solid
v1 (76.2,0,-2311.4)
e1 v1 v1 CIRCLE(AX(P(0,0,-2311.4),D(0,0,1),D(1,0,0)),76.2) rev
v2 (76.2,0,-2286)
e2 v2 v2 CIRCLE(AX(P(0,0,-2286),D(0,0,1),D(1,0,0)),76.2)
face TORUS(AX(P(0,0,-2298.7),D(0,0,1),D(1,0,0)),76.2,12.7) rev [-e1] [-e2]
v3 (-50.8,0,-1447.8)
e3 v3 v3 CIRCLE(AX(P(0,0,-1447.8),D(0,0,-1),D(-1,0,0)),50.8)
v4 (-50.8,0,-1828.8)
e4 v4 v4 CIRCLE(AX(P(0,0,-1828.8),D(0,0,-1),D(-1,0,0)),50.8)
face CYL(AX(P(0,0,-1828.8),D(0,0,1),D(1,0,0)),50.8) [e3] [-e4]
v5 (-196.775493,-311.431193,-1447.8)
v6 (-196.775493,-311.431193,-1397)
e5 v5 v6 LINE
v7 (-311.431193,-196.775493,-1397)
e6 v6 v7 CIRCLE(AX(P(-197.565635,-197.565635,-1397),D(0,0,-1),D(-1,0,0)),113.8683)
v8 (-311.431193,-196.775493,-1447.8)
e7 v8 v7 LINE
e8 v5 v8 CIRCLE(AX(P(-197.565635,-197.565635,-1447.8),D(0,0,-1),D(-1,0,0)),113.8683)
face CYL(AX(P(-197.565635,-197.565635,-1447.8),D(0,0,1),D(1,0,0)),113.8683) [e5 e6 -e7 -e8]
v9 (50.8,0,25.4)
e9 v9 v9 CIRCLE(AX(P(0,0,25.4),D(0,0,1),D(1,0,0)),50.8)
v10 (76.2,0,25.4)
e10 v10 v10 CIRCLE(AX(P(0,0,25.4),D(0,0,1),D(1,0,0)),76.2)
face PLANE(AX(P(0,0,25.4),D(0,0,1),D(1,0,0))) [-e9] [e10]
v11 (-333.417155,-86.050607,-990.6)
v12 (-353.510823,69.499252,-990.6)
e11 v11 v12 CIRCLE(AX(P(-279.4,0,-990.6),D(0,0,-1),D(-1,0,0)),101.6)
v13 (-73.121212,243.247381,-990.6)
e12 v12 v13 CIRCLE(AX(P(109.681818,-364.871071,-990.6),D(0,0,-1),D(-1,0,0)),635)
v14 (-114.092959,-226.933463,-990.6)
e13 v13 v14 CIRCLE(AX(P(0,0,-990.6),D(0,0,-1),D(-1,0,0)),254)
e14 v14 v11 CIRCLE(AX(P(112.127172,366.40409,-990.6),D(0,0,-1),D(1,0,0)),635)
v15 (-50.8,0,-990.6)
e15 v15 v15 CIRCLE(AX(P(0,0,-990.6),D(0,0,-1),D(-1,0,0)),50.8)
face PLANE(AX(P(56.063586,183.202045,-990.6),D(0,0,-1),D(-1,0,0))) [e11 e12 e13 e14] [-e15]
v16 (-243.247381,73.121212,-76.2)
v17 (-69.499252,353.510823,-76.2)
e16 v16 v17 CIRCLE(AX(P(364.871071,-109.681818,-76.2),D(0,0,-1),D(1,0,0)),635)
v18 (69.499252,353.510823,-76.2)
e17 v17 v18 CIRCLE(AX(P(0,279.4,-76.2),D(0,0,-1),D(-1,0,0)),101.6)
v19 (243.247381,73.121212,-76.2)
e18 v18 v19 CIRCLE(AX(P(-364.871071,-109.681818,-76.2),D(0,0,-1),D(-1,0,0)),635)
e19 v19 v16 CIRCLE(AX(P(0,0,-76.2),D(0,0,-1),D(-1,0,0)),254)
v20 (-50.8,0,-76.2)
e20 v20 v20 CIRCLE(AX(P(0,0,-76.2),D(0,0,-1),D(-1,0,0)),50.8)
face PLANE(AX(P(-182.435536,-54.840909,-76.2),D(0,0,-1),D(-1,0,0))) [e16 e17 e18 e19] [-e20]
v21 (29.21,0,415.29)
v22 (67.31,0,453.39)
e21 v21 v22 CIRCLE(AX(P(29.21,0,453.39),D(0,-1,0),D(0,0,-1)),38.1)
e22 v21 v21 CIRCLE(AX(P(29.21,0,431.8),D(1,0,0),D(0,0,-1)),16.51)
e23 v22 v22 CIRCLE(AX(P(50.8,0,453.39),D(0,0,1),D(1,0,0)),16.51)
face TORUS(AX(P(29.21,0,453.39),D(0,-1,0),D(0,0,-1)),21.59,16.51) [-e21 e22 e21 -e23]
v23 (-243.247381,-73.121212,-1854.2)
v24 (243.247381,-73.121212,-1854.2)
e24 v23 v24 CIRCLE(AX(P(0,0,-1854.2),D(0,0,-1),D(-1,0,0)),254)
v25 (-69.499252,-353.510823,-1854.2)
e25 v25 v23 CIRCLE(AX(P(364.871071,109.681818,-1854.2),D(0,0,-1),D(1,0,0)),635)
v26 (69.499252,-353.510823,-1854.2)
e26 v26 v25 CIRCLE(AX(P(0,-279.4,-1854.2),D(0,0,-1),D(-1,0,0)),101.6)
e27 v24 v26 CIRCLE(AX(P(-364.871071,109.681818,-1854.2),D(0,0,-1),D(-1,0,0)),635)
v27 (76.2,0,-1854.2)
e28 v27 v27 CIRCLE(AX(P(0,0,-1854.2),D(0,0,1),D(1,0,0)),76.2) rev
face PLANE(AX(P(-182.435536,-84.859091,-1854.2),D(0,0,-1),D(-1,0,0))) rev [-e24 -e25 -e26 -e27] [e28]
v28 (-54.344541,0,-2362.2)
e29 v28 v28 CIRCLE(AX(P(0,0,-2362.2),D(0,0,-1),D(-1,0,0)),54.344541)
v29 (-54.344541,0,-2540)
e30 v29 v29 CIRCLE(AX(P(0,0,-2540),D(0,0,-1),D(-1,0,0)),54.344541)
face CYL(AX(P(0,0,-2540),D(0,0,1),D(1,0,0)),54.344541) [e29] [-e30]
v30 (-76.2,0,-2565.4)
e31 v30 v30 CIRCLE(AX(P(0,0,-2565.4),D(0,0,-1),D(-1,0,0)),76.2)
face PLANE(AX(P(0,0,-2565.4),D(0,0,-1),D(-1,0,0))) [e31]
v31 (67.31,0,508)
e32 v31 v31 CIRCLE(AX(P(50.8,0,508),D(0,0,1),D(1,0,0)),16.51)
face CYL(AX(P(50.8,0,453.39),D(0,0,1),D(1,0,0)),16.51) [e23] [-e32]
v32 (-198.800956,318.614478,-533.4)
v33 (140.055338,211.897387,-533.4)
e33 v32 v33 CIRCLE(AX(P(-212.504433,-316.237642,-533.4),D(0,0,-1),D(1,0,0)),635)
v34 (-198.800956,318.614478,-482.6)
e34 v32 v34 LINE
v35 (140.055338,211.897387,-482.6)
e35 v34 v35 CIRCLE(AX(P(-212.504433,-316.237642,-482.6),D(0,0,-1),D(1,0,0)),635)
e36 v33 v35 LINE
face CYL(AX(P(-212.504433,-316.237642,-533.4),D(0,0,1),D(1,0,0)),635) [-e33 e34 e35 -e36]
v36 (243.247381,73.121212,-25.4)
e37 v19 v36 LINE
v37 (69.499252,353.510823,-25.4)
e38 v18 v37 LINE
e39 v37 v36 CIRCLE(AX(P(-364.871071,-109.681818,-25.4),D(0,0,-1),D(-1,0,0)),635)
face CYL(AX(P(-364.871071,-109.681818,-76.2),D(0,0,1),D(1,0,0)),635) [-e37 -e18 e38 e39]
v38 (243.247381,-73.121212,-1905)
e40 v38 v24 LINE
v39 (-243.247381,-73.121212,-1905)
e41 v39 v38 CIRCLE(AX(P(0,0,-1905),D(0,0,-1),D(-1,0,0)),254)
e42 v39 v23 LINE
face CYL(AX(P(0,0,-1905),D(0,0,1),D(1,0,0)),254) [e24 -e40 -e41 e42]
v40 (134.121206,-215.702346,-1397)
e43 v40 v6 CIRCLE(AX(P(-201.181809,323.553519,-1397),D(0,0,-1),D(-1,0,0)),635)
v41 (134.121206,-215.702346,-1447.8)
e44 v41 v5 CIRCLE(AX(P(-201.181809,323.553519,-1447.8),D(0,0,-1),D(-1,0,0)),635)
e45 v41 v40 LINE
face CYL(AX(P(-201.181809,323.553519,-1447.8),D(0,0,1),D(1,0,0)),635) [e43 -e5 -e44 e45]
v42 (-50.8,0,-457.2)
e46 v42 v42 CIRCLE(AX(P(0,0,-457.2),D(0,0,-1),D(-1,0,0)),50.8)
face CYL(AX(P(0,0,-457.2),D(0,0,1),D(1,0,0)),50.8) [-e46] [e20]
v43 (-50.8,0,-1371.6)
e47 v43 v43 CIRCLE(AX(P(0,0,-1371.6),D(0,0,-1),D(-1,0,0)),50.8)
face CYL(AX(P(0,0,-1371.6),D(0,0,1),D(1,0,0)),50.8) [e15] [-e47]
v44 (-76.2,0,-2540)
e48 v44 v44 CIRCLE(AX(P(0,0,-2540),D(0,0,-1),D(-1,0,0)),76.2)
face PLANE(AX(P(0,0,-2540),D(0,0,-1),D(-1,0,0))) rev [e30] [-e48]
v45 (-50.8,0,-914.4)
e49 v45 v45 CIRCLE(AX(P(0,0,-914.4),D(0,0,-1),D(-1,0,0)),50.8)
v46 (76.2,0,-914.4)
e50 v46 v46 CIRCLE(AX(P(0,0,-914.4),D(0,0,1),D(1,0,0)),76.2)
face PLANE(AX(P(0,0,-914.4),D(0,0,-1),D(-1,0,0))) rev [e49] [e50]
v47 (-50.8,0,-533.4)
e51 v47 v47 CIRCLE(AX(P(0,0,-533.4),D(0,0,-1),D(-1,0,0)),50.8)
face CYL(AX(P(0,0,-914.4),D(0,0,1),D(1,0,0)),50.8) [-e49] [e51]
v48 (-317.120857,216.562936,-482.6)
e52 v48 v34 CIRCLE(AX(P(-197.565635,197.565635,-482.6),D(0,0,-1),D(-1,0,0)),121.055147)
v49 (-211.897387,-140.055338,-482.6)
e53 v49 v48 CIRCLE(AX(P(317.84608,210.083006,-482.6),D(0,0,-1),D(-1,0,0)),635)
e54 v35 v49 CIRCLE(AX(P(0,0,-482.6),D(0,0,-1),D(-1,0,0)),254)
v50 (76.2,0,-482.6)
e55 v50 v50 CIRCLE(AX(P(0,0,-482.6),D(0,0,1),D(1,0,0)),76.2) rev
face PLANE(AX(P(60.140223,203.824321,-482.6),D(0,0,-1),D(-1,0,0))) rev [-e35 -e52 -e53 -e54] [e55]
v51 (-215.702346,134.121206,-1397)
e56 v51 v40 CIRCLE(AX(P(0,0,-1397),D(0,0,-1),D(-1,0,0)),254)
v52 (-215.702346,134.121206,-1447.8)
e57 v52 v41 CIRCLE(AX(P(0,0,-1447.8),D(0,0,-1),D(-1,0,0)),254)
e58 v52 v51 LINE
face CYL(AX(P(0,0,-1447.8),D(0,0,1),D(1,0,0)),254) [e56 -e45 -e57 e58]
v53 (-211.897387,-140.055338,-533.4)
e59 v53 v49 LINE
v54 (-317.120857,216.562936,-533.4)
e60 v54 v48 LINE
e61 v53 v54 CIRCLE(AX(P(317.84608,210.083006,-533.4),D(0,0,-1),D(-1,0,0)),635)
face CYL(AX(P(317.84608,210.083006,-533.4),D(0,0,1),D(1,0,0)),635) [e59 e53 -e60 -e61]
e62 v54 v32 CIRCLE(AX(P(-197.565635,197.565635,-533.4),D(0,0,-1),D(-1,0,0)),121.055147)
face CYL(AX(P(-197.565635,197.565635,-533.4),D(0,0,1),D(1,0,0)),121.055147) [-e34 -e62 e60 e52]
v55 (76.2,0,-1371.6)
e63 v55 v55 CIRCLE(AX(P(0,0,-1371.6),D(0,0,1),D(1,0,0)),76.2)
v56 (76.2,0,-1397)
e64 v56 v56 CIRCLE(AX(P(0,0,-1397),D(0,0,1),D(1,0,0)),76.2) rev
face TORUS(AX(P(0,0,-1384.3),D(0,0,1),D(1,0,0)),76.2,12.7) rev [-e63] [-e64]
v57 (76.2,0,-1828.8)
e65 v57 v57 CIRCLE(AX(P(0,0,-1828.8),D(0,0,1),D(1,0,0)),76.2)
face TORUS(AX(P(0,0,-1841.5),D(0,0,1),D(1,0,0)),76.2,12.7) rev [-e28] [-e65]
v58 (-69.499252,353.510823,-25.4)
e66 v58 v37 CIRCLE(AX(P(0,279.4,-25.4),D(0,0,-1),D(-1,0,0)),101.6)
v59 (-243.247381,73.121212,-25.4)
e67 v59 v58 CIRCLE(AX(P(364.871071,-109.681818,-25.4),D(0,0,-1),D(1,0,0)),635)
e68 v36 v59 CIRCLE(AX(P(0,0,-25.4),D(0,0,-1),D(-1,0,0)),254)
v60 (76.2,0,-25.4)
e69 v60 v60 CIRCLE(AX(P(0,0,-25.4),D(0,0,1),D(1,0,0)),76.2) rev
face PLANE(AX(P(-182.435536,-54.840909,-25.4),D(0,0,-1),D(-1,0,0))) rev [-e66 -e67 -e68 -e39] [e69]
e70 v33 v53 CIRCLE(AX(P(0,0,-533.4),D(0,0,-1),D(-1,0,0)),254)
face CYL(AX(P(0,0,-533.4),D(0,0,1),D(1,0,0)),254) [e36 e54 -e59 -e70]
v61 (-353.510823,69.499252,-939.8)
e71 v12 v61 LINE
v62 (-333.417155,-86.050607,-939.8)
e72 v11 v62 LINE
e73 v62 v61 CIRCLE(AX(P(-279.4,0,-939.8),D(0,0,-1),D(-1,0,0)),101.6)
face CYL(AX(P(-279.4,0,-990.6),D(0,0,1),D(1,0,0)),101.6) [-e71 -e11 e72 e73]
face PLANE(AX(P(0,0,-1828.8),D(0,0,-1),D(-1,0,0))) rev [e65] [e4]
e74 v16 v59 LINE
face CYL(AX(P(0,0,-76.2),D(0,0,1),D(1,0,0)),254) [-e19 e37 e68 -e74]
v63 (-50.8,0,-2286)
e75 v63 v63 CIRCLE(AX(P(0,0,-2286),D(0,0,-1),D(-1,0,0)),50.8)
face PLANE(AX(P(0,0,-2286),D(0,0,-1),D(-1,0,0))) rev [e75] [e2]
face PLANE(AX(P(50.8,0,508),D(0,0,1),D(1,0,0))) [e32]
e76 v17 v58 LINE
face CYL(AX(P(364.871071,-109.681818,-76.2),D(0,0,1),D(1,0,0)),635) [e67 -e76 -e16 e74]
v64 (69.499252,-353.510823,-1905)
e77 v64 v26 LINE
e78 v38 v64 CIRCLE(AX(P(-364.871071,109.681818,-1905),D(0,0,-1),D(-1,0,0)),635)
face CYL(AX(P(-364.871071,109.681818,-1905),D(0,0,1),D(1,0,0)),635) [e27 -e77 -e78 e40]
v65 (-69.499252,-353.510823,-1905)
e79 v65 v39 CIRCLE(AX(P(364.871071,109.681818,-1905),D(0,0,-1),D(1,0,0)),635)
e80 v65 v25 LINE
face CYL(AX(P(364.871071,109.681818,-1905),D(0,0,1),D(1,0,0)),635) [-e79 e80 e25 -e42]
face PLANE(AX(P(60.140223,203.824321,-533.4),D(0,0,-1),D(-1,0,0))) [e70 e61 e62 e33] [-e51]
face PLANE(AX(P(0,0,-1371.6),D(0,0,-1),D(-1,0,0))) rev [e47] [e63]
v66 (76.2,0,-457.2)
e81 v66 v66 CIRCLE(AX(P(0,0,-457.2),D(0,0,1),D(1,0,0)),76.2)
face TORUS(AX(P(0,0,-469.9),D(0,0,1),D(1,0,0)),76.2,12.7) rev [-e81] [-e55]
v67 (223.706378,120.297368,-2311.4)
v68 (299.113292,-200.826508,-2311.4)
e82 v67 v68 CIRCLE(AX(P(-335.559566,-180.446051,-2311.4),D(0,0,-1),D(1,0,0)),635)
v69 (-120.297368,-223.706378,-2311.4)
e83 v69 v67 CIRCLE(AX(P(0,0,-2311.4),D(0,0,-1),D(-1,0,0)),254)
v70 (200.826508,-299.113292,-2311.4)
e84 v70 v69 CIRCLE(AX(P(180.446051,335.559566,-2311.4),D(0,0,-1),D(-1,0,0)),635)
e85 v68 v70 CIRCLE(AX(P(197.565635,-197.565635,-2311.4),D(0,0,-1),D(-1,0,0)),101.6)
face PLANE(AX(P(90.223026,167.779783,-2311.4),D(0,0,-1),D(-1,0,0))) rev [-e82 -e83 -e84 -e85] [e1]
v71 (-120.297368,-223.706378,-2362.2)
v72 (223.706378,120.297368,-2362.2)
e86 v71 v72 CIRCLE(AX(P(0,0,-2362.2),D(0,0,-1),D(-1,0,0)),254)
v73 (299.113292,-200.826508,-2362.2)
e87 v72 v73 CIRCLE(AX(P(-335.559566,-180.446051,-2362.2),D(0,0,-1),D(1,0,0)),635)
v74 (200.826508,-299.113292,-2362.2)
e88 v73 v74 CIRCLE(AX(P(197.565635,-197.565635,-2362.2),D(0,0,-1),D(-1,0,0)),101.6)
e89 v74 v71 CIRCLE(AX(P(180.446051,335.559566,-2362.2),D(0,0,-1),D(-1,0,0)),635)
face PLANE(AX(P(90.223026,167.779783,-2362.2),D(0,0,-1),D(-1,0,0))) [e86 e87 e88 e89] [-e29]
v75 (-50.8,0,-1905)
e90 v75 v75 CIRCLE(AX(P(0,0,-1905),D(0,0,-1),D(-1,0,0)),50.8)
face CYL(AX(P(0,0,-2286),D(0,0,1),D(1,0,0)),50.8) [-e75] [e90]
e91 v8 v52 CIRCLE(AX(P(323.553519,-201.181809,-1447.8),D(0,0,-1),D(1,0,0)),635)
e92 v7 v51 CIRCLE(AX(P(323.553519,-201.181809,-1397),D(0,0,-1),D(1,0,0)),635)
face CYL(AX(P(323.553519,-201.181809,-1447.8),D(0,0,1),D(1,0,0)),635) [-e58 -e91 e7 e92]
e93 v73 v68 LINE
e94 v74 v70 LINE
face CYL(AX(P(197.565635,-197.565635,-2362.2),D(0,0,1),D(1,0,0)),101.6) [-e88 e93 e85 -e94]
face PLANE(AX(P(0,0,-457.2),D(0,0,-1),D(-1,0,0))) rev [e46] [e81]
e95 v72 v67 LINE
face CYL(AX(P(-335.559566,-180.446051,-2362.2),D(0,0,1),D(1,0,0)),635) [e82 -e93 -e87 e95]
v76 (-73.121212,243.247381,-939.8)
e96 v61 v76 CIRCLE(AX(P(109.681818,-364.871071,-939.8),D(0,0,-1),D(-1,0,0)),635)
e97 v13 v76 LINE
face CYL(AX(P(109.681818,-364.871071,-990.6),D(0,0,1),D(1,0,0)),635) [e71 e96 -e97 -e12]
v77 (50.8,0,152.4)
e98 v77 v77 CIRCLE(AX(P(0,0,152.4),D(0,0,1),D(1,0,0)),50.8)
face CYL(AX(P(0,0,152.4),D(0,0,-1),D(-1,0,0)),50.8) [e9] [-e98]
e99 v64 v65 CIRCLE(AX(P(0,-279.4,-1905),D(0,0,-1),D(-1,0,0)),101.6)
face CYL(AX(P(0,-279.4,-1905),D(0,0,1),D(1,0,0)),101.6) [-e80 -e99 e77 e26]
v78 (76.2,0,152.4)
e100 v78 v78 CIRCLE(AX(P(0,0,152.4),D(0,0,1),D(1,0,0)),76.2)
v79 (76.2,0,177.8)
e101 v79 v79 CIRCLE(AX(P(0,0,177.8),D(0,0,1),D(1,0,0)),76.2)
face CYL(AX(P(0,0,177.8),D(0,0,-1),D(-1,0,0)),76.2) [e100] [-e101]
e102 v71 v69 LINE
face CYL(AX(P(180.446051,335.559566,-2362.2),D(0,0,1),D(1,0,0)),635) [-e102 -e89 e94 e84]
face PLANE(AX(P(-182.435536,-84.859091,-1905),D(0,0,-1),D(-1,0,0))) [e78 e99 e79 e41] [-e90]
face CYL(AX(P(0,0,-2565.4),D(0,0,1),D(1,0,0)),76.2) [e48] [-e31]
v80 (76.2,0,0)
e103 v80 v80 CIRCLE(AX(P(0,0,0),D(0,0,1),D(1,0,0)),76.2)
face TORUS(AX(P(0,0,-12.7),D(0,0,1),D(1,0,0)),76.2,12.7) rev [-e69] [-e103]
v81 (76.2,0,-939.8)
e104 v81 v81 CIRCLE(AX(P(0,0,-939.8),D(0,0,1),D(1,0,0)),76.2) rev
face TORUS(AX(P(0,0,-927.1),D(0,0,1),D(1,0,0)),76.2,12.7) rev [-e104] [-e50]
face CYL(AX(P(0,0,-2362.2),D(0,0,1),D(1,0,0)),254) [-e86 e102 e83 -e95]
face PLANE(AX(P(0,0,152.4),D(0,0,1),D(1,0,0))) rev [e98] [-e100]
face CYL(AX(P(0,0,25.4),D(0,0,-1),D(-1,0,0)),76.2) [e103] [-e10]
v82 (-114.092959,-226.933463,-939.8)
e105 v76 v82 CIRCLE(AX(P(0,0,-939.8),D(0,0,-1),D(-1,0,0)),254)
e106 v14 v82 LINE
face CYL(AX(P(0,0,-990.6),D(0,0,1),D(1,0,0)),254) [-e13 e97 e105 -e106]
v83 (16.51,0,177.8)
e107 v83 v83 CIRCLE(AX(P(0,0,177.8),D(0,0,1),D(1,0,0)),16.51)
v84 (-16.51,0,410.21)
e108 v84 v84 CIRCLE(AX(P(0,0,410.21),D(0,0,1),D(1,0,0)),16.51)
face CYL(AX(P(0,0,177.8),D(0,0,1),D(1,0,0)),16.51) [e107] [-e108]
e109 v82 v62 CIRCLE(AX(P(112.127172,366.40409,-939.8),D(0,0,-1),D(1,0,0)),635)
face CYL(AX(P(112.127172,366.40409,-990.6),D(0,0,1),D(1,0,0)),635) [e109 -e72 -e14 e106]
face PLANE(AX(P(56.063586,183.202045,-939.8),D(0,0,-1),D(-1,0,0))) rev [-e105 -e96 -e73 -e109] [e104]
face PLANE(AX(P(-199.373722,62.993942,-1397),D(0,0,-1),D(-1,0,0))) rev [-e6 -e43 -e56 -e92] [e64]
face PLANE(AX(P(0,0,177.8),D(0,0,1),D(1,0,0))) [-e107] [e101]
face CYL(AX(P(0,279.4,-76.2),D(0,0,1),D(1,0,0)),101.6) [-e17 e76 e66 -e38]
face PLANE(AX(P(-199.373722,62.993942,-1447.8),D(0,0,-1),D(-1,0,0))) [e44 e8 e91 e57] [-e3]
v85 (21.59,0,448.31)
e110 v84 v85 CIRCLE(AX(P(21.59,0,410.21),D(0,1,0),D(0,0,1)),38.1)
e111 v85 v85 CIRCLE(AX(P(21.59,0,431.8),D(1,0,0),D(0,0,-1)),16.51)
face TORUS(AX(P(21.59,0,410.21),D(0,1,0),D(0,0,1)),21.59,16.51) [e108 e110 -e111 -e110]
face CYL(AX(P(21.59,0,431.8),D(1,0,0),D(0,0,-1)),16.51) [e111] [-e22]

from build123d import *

# Parameters (mm, degrees)
SKETCH1_R            = 76.2
BOSS_EXTRUDE4_DEPTH  = 25.4
SKETCH7_R            = 50.8
BOSS_EXTRUDE5_DEPTH  = 127
SKETCH8_R            = 76.2
BOSS_EXTRUDE6_DEPTH  = 25.4
BOSS_EXTRUDE7_DEPTH  = 50.8
BOSS_EXTRUDE8_START  = 381
SKETCH12_R           = 50.8
BOSS_EXTRUDE8_DEPTH  = 381
BOSS_EXTRUDE10_DEPTH = 50.8
BOSS_EXTRUDE11_START = 381
SKETCH15_R           = 50.8
BOSS_EXTRUDE11_DEPTH = 381
BOSS_EXTRUDE12_DEPTH = 50.8
BOSS_EXTRUDE13_START = 381
SKETCH19_R           = 50.8
BOSS_EXTRUDE13_DEPTH = 381
BOSS_EXTRUDE14_DEPTH = 50.8
BOSS_EXTRUDE15_START = 381
SKETCH23_R           = 50.8
BOSS_EXTRUDE15_DEPTH = 381
BOSS_EXTRUDE16_DEPTH = 50.8
BOSS_EXTRUDE17_START = 381
SKETCH26_R           = 50.8
BOSS_EXTRUDE17_DEPTH = 381
BOSS_EXTRUDE18_DEPTH = 50.8
SKETCH29_R           = 54.344540656
BOSS_EXTRUDE19_DEPTH = 177.8
BOSS_EXTRUDE20_START = 25.4
SKETCH30_R           = 76.2
BOSS_EXTRUDE20_DEPTH = 25.4
SKETCH33_R           = 16.51


with BuildPart() as part:
    # Sketch1 → Boss-Extrude4 (new body)
    with BuildSketch(Plane.XY):
        Circle(SKETCH1_R)
    extrude(amount=BOSS_EXTRUDE4_DEPTH)

    # Sketch7 → Boss-Extrude5 (add)
    with BuildSketch(Plane.XY.offset(25.4)):
        Circle(SKETCH7_R)
    extrude(amount=BOSS_EXTRUDE5_DEPTH)

    # Sketch8 → Boss-Extrude6 (add)
    with BuildSketch(Plane.XY.offset(152.4)):
        Circle(SKETCH8_R)
    extrude(amount=BOSS_EXTRUDE6_DEPTH)

    # Sketch10 → Revolve2 (revolve)
    with BuildSketch(Plane(origin=(0, 0, 0), x_dir=(0, 0, -1), z_dir=(1, 0, 0))):
        with BuildLine():
            Line((0, 0), (25.4, 0))
            Line((25.4, 0), (25.4, 76.2))
            ThreePointArc((25.4, 76.2), (12.7, 63.5), (0, 76.2))
            Line((0, 76.2), (0, 0))
        make_face()
    revolve(axis=Axis((0, 0, 0), (0, 0, -1)))

    # Sketch11 → Boss-Extrude7 (add)
    with BuildSketch(Plane(origin=(0, 0, -25.4), x_dir=(-1, 0, 0), z_dir=(0, 0, -1))):
        with BuildLine():
            ThreePointArc((-243.247380948, 73.121212121), (0, -254), (243.247380948, 73.121212121))
            ThreePointArc((243.247380948, 73.121212121), (174.897670874, 224.794944599), (69.499251699, 353.510822511))
            ThreePointArc((69.499251699, 353.510822511), (0, 381), (-69.499251699, 353.510822511))
            ThreePointArc((-69.499251699, 353.510822511), (-174.897670874, 224.794944599), (-243.247380948, 73.121212121))
        make_face()
    extrude(amount=BOSS_EXTRUDE7_DEPTH)

    # Sketch12 → Boss-Extrude8 (add)
    with BuildSketch(Plane(origin=(0, 0, -76.2), x_dir=(-1, 0, 0), z_dir=(0, 0, -1)).offset(BOSS_EXTRUDE8_START)):
        Circle(SKETCH12_R)
    extrude(amount=-BOSS_EXTRUDE8_DEPTH)

    # Sketch13 → Revolve3 (revolve)
    with BuildSketch(Plane(origin=(0, 0, 0), x_dir=(0, 0, -1), z_dir=(1, 0, 0))):
        with BuildLine():
            Line((457.2, 0), (482.6, 0))
            Line((482.6, 0), (482.6, 76.2))
            ThreePointArc((482.6, 76.2), (469.9, 63.5), (457.2, 76.2))
            Line((457.2, 76.2), (457.2, 0))
        make_face()
    revolve(axis=Axis((0, 0, -457.2), (0, 0, -1)))

    # Sketch14 → Boss-Extrude10 (add)
    with BuildSketch(Plane(origin=(0, 0, -482.6), x_dir=(-1, 0, 0), z_dir=(0, 0, -1))):
        with BuildLine():
            ThreePointArc((-140.055337565, 211.897386533), (-179.605122421, -179.605122421), (211.897386533, -140.055337565))
            ThreePointArc((211.897386533, -140.055337565), (291.195568065, 30.379719884), (317.120856754, 216.562935583))
            ThreePointArc((317.120856754, 216.562935583), (276.630280142, 289.234224741), (198.800955585, 318.614478333))
            ThreePointArc((198.800955585, 318.614478333), (21.75767384, 289.436093569), (-140.055337565, 211.897386533))
        make_face()
    extrude(amount=BOSS_EXTRUDE10_DEPTH)

    # Sketch15 → Boss-Extrude11 (add)
    with BuildSketch(Plane(origin=(0, 0, -533.4), x_dir=(-1, 0, 0), z_dir=(0, 0, -1)).offset(BOSS_EXTRUDE11_START)):
        Circle(SKETCH15_R)
    extrude(amount=-BOSS_EXTRUDE11_DEPTH)

    # Sketch17 → Revolve4 (revolve)
    with BuildSketch(Plane(origin=(0, 0, 0), x_dir=(0, 0, -1), z_dir=(1, 0, 0))):
        with BuildLine():
            Line((914.4, 0), (939.8, 0))
            Line((939.8, 0), (939.8, 76.2))
            ThreePointArc((939.8, 76.2), (927.1, 63.5), (914.4, 76.2))
            Line((914.4, 76.2), (914.4, 0))
        make_face()
    revolve(axis=Axis((0, 0, -914.4), (0, 0, -1)))

    # Sketch18 → Boss-Extrude12 (add)
    with BuildSketch(Plane(origin=(0, 0, -939.8), x_dir=(-1, 0, 0), z_dir=(0, 0, -1))):
        with BuildLine():
            ThreePointArc((333.417154616, -86.050607245), (380.162762393, -13.016363354), (353.510822511, 69.499251699))
            ThreePointArc((353.510822511, 69.499251699), (224.794944599, 174.897670874), (73.121212121, 243.247380948))
            ThreePointArc((73.121212121, 243.247380948), (-253.041089583, -22.050101644), (114.09295874, -226.933463301))
            ThreePointArc((114.09295874, -226.933463301), (231.062085307, -167.867501553), (333.417154616, -86.050607245))
        make_face()
    extrude(amount=BOSS_EXTRUDE12_DEPTH)

    # Sketch19 → Boss-Extrude13 (add)
    with BuildSketch(Plane(origin=(0, 0, -990.6), x_dir=(-1, 0, 0), z_dir=(0, 0, -1)).offset(BOSS_EXTRUDE13_START)):
        Circle(SKETCH19_R)
    extrude(amount=-BOSS_EXTRUDE13_DEPTH)

    # Sketch21 → Revolve5 (revolve)
    with BuildSketch(Plane(origin=(0, 0, 0), x_dir=(0, 0, -1), z_dir=(1, 0, 0))):
        with BuildLine():
            Line((1371.6, 0), (1397, 0))
            Line((1397, 0), (1397, 76.2))
            ThreePointArc((1397, 76.2), (1384.3, 63.5), (1371.6, 76.2))
            Line((1371.6, 76.2), (1371.6, 0))
        make_face()
    revolve(axis=Axis((0, 0, -1371.6), (0, 0, -1)))

    # Sketch22 → Boss-Extrude14 (add)
    with BuildSketch(Plane(origin=(0, 0, -1397), x_dir=(-1, 0, 0), z_dir=(0, 0, -1))):
        with BuildLine():
            ThreePointArc((196.775493442, -311.431192903), (278.082681543, -278.082681543), (311.431192903, -196.775493442))
            ThreePointArc((311.431192903, -196.775493442), (286.432865733, -24.711952191), (215.702346017, 134.12120609))
            ThreePointArc((215.702346017, 134.12120609), (-179.605122421, 179.605122421), (-134.12120609, -215.702346017))
            ThreePointArc((-134.12120609, -215.702346017), (24.711952191, -286.432865733), (196.775493442, -311.431192903))
        make_face()
    extrude(amount=BOSS_EXTRUDE14_DEPTH)

    # Sketch23 → Boss-Extrude15 (add)
    with BuildSketch(Plane(origin=(0, 0, -1447.8), x_dir=(-1, 0, 0), z_dir=(0, 0, -1)).offset(BOSS_EXTRUDE15_START)):
        Circle(SKETCH23_R)
    extrude(amount=-BOSS_EXTRUDE15_DEPTH)

    # Sketch24 → Revolve6 (revolve)
    with BuildSketch(Plane(origin=(0, 0, 0), x_dir=(0, 0, -1), z_dir=(1, 0, 0))):
        with BuildLine():
            Line((1828.8, 0), (1854.2, 0))
            Line((1854.2, 0), (1854.2, 76.2))
            ThreePointArc((1854.2, 76.2), (1841.5, 63.5), (1828.8, 76.2))
            Line((1828.8, 76.2), (1828.8, 0))
        make_face()
    revolve(axis=Axis((0, 0, -1828.8), (0, 0, -1)))

    # Sketch25 → Boss-Extrude16 (add)
    with BuildSketch(Plane(origin=(0, 0, -1854.2), x_dir=(-1, 0, 0), z_dir=(0, 0, -1))):
        with BuildLine():
            ThreePointArc((243.247380948, -73.121212121), (0, 254), (-243.247380948, -73.121212121))
            ThreePointArc((-243.247380948, -73.121212121), (-174.897670874, -224.794944599), (-69.499251699, -353.510822511))
            ThreePointArc((-69.499251699, -353.510822511), (0, -381), (69.499251699, -353.510822511))
            ThreePointArc((69.499251699, -353.510822511), (174.897670874, -224.794944599), (243.247380948, -73.121212121))
        make_face()
    extrude(amount=BOSS_EXTRUDE16_DEPTH)

    # Sketch26 → Boss-Extrude17 (add)
    with BuildSketch(Plane(origin=(0, 0, -1905), x_dir=(-1, 0, 0), z_dir=(0, 0, -1)).offset(BOSS_EXTRUDE17_START)):
        Circle(SKETCH26_R)
    extrude(amount=-BOSS_EXTRUDE17_DEPTH)

    # Sketch27 → Revolve7 (revolve)
    with BuildSketch(Plane(origin=(0, 0, 0), x_dir=(0, 0, -1), z_dir=(1, 0, 0))):
        with BuildLine():
            Line((2286, 0), (2311.4, 0))
            Line((2311.4, 0), (2311.4, 76.2))
            ThreePointArc((2311.4, 76.2), (2298.7, 63.5), (2286, 76.2))
            Line((2286, 76.2), (2286, 0))
        make_face()
    revolve(axis=Axis((0, 0, -2286), (0, 0, -1)))

    # Sketch28 → Boss-Extrude18 (add)
    with BuildSketch(Plane(origin=(0, 0, -2311.4), x_dir=(-1, 0, 0), z_dir=(0, 0, -1))):
        with BuildLine():
            ThreePointArc((120.297367635, -223.706377513), (179.605122421, 179.605122421), (-223.706377513, 120.297367635))
            ThreePointArc((-223.706377513, 120.297367635), (-282.625358791, -35.282700614), (-299.113291984, -200.826507656))
            ThreePointArc((-299.113291984, -200.826507656), (-269.407683632, -269.407683632), (-200.826507656, -299.113291984))
            ThreePointArc((-200.826507656, -299.113291984), (-35.282700614, -282.625358791), (120.297367635, -223.706377513))
        make_face()
    extrude(amount=BOSS_EXTRUDE18_DEPTH)

    # Sketch29 → Boss-Extrude19 (add)
    with BuildSketch(Plane(origin=(0, 0, -2362.2), x_dir=(-1, 0, 0), z_dir=(0, 0, -1))):
        Circle(SKETCH29_R)
    extrude(amount=BOSS_EXTRUDE19_DEPTH)

    # Sketch30 → Boss-Extrude20 (add)
    with BuildSketch(Plane(origin=(0, 0, -2540), x_dir=(-1, 0, 0), z_dir=(0, 0, -1)).offset(BOSS_EXTRUDE20_START)):
        Circle(SKETCH30_R)
    extrude(amount=-BOSS_EXTRUDE20_DEPTH)

    # Sweep1: sweep along a curve in space
    with BuildLine() as sweep1_path:
        Line((0, 0, 177.8), (0, 0, 410.21))
        ThreePointArc((21.59, 0, 431.8), (6.323564594, 0, 425.476435406), (0, 0, 410.21))
        Line((21.59, 0, 431.8), (29.21, 0, 431.8))
        ThreePointArc((29.21, 0, 431.8), (44.476435406, 0, 438.123564594), (50.8, 0, 453.39))
        Line((50.8, 0, 453.39), (50.8, 0, 508))
    # Sketch33 → Sweep1 (sweep)
    with BuildSketch(Plane.XY.offset(177.8)):
        Circle(SKETCH33_R)
    sweep(path=sweep1_path.line)


solid = part.part
